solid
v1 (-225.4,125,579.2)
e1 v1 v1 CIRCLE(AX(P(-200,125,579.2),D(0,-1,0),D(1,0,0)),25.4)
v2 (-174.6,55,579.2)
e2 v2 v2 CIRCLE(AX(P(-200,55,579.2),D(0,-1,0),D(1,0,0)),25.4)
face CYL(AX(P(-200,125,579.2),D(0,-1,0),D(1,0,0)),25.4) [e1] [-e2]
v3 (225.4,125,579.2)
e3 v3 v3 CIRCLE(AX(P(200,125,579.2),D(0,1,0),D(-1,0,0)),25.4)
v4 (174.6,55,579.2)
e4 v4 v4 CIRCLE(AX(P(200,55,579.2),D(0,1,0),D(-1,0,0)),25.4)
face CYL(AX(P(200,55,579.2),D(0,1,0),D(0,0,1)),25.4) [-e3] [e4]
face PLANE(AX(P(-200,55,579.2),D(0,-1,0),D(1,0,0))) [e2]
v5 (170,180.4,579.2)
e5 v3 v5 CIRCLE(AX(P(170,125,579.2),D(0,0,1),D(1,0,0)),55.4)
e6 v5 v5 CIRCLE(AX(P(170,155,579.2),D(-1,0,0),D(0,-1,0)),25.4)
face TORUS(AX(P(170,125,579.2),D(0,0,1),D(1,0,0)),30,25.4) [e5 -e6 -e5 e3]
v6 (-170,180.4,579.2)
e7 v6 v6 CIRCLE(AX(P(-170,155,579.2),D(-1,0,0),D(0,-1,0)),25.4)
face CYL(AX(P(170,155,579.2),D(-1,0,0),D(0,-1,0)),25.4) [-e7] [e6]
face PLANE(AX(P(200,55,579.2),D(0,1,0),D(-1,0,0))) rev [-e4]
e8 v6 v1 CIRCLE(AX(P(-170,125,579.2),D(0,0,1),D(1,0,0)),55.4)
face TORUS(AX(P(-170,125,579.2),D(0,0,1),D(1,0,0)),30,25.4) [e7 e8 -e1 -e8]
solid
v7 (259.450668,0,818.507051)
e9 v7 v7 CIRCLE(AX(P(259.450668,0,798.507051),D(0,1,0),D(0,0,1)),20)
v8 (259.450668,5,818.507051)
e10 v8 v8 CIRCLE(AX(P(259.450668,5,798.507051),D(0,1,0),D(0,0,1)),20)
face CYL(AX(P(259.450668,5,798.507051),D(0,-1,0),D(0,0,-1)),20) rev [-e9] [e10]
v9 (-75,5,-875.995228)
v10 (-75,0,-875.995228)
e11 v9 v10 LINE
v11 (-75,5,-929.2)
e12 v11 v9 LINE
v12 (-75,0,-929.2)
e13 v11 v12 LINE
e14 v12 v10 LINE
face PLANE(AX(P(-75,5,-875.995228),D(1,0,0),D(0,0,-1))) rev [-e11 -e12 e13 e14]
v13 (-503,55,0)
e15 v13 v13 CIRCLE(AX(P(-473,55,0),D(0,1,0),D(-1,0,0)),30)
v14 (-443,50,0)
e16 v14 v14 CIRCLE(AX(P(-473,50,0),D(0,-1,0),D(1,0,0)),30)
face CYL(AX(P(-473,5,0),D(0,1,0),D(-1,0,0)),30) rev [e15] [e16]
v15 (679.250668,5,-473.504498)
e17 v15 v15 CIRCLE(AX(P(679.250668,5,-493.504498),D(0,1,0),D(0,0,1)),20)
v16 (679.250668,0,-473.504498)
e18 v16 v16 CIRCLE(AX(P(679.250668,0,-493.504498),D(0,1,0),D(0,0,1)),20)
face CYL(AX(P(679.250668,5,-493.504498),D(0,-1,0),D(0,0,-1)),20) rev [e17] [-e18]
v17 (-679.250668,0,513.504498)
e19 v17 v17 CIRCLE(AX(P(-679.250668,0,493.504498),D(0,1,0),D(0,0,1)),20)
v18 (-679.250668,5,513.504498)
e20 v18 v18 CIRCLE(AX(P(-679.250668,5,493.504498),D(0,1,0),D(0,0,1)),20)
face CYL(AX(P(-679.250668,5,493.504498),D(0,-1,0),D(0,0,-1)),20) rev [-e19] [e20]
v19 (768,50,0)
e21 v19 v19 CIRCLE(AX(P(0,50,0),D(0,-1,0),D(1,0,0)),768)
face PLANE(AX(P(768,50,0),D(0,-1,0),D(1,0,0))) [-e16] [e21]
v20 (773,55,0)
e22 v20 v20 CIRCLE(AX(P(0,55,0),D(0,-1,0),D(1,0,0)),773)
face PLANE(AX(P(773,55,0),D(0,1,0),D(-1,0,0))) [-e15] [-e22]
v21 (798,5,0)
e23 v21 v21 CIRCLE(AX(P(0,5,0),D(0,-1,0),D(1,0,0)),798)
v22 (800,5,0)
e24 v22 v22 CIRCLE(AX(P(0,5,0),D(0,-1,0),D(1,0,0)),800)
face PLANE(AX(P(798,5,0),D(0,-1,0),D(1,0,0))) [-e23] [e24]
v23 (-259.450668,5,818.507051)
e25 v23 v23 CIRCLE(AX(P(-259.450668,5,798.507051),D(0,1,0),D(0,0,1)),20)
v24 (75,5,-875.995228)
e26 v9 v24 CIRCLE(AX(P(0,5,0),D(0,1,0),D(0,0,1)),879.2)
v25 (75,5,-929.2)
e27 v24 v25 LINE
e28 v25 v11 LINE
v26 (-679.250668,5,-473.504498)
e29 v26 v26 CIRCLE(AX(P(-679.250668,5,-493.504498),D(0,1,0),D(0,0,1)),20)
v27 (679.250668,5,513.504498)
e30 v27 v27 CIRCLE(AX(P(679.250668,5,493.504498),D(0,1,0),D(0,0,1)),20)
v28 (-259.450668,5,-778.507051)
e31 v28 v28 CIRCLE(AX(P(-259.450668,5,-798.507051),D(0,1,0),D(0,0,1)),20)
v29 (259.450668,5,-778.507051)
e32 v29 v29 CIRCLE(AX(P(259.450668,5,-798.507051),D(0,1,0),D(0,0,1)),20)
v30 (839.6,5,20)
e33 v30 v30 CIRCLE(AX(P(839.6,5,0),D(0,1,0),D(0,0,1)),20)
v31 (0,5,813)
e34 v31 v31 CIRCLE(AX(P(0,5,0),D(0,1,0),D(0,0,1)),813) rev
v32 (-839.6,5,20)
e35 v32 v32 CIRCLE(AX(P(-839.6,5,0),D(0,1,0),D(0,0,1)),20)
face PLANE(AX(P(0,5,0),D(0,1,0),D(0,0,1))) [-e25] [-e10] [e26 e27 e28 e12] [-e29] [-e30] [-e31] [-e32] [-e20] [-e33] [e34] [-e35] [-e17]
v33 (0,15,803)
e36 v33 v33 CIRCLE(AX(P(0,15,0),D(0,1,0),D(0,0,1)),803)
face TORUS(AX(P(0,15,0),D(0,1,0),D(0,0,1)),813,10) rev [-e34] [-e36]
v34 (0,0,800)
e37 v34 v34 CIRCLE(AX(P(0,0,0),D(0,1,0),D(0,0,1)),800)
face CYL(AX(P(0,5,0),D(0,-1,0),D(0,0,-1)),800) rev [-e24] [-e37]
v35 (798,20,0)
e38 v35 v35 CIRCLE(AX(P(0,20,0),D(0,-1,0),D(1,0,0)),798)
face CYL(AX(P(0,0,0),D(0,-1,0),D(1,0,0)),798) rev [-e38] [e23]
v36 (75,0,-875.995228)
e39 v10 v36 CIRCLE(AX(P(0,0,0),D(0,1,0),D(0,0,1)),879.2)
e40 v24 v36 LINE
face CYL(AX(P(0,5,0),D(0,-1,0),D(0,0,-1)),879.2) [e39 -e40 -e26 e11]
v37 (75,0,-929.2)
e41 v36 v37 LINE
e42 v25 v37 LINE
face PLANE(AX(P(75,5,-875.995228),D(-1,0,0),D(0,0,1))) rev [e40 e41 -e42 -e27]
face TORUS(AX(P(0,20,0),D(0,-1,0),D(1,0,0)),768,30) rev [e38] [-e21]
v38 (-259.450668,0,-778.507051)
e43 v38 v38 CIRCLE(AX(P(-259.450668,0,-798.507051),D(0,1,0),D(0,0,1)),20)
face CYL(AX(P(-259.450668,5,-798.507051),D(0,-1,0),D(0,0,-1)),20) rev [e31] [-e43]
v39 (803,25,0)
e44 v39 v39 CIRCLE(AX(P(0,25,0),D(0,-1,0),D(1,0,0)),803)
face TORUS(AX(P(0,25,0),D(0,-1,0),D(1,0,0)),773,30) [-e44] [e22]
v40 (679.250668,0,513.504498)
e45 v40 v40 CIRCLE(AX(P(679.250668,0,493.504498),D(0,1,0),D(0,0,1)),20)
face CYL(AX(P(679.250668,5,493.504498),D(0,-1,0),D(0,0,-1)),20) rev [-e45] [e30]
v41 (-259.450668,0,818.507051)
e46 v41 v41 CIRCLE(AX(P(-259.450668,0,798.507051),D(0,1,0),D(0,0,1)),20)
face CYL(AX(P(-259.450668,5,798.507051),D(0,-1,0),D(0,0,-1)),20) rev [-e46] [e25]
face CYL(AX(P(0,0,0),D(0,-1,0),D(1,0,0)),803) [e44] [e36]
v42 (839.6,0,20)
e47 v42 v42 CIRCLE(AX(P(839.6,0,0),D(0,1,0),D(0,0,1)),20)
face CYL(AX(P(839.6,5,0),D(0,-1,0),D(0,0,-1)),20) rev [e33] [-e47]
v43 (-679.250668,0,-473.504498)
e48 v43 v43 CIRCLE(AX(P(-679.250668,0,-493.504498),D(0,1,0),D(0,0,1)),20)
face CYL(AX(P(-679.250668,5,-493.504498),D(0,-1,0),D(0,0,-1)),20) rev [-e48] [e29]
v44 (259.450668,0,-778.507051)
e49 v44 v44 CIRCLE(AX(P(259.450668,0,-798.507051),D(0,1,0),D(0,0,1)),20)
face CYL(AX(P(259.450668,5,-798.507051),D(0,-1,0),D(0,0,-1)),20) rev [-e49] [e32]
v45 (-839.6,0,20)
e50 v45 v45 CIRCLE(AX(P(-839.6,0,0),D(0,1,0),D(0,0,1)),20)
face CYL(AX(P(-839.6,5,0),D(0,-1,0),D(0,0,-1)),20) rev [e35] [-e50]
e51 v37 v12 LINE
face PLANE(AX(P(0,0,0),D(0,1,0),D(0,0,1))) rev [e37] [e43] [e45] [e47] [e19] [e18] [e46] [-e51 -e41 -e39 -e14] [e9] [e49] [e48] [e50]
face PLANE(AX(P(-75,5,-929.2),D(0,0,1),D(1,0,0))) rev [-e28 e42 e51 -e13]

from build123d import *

# Parameters (mm, degrees)
BOSS_EXTRUDE1_OUTLINE_R   = 20
BOSS_EXTRUDE1_OUTLINE_R_2 = 800
BOSS_EXTRUDE1_DEPTH       = 5
FILLET1_R                 = 10
SKETCH3_R                 = 25.4
SKETCH7_R                 = 30
CUT_EXTRUDE1_DEPTH        = 50


# Read off the part's stored shape, not the designer's step: Boss-Extrude1
with BuildPart() as part:
    # Boss-Extrude1 outline → Boss-Extrude1 (new body)
    with BuildSketch(Plane(origin=(0, 0, 0), x_dir=(1, 0, 0), z_dir=(0, 1, 0))):
        with BuildLine():
            Line((75, 875.995228298), (75, 929.2))
            Line((75, 929.2), (-75, 929.2))
            Line((-75, 929.2), (-75, 875.995228298))
            ThreePointArc((-75, 875.995228298), (0, -879.2), (75, 875.995228298))
        make_face()
        with Locations((-679.250668477, -493.504497825)):
            Circle(BOSS_EXTRUDE1_OUTLINE_R, mode=Mode.SUBTRACT)
        with Locations((-259.450668477, -798.507051081)):
            Circle(BOSS_EXTRUDE1_OUTLINE_R, mode=Mode.SUBTRACT)
        with Locations((-839.6, 0)):
            Circle(BOSS_EXTRUDE1_OUTLINE_R, mode=Mode.SUBTRACT)
        with Locations((259.450668477, -798.507051081)):
            Circle(BOSS_EXTRUDE1_OUTLINE_R, mode=Mode.SUBTRACT)
        with Locations((679.250668477, -493.504497825)):
            Circle(BOSS_EXTRUDE1_OUTLINE_R, mode=Mode.SUBTRACT)
        Circle(BOSS_EXTRUDE1_OUTLINE_R_2, mode=Mode.SUBTRACT)
        with Locations((839.6, 0)):
            Circle(BOSS_EXTRUDE1_OUTLINE_R, mode=Mode.SUBTRACT)
        with Locations((-679.250668477, 493.504497825)):
            Circle(BOSS_EXTRUDE1_OUTLINE_R, mode=Mode.SUBTRACT)
        with Locations((-259.450668477, 798.507051081)):
            Circle(BOSS_EXTRUDE1_OUTLINE_R, mode=Mode.SUBTRACT)
        with Locations((259.450668477, 798.507051081)):
            Circle(BOSS_EXTRUDE1_OUTLINE_R, mode=Mode.SUBTRACT)
        with Locations((679.250668477, 493.504497825)):
            Circle(BOSS_EXTRUDE1_OUTLINE_R, mode=Mode.SUBTRACT)
    extrude(amount=BOSS_EXTRUDE1_DEPTH)

    # Sketch2 → Revolve1 (revolve)
    with BuildSketch(Plane.XY):
        with BuildLine():
            Line((803, 5), (803, 25))
            ThreePointArc((803, 25), (794.213203436, 46.213203436), (773, 55))
            Line((773, 55), (0, 55))
            Line((0, 55), (0, 50))
            Line((0, 50), (768, 50))
            ThreePointArc((768, 50), (789.213203436, 41.213203436), (798, 20))
            Line((798, 20), (798, 5))
            Line((798, 5), (803, 5))
        make_face()
    revolve(axis=Axis((0, 0, 0), (0, 1, 0)))

    # Fillet1
    fillet1_edges = [part.edges().sort_by_distance(p)[0] for p in [
        (-803, 5, 0),
    ]]
    fillet(fillet1_edges, radius=FILLET1_R)

    # Sketch7 → Cut-Extrude1 (cut)
    with BuildSketch(Plane(origin=(0, 55, 0), x_dir=(1, 0, 0), z_dir=(0, 1, 0))):
        with Locations(Location((-473, 0, 0), (0, 0, 180))):
            Circle(SKETCH7_R)
    extrude(amount=-CUT_EXTRUDE1_DEPTH, mode=Mode.SUBTRACT)


with BuildPart() as body_2:
    # Sweep1: sweep along a path in Sketch4
    with BuildLine(Plane.XY) as sweep1_path:
        Line((200, 55), (200, 125))
        ThreePointArc((200, 125), (191.213203436, 146.213203436), (170, 155))
        Line((170, 155), (-170, 155))
        ThreePointArc((-170, 155), (-191.213203436, 146.213203436), (-200, 125))
        Line((-200, 125), (-200, 55))
    # Sketch3 → Sweep1 (sweep)
    with BuildSketch(Plane(origin=(0, 55, 0), x_dir=(1, 0, 0), z_dir=(0, 1, 0))):
        with Locations((200, -579.2)):
            Circle(SKETCH3_R)
    sweep(path=sweep1_path.line)


solid = Compound([part.part, body_2.part])
